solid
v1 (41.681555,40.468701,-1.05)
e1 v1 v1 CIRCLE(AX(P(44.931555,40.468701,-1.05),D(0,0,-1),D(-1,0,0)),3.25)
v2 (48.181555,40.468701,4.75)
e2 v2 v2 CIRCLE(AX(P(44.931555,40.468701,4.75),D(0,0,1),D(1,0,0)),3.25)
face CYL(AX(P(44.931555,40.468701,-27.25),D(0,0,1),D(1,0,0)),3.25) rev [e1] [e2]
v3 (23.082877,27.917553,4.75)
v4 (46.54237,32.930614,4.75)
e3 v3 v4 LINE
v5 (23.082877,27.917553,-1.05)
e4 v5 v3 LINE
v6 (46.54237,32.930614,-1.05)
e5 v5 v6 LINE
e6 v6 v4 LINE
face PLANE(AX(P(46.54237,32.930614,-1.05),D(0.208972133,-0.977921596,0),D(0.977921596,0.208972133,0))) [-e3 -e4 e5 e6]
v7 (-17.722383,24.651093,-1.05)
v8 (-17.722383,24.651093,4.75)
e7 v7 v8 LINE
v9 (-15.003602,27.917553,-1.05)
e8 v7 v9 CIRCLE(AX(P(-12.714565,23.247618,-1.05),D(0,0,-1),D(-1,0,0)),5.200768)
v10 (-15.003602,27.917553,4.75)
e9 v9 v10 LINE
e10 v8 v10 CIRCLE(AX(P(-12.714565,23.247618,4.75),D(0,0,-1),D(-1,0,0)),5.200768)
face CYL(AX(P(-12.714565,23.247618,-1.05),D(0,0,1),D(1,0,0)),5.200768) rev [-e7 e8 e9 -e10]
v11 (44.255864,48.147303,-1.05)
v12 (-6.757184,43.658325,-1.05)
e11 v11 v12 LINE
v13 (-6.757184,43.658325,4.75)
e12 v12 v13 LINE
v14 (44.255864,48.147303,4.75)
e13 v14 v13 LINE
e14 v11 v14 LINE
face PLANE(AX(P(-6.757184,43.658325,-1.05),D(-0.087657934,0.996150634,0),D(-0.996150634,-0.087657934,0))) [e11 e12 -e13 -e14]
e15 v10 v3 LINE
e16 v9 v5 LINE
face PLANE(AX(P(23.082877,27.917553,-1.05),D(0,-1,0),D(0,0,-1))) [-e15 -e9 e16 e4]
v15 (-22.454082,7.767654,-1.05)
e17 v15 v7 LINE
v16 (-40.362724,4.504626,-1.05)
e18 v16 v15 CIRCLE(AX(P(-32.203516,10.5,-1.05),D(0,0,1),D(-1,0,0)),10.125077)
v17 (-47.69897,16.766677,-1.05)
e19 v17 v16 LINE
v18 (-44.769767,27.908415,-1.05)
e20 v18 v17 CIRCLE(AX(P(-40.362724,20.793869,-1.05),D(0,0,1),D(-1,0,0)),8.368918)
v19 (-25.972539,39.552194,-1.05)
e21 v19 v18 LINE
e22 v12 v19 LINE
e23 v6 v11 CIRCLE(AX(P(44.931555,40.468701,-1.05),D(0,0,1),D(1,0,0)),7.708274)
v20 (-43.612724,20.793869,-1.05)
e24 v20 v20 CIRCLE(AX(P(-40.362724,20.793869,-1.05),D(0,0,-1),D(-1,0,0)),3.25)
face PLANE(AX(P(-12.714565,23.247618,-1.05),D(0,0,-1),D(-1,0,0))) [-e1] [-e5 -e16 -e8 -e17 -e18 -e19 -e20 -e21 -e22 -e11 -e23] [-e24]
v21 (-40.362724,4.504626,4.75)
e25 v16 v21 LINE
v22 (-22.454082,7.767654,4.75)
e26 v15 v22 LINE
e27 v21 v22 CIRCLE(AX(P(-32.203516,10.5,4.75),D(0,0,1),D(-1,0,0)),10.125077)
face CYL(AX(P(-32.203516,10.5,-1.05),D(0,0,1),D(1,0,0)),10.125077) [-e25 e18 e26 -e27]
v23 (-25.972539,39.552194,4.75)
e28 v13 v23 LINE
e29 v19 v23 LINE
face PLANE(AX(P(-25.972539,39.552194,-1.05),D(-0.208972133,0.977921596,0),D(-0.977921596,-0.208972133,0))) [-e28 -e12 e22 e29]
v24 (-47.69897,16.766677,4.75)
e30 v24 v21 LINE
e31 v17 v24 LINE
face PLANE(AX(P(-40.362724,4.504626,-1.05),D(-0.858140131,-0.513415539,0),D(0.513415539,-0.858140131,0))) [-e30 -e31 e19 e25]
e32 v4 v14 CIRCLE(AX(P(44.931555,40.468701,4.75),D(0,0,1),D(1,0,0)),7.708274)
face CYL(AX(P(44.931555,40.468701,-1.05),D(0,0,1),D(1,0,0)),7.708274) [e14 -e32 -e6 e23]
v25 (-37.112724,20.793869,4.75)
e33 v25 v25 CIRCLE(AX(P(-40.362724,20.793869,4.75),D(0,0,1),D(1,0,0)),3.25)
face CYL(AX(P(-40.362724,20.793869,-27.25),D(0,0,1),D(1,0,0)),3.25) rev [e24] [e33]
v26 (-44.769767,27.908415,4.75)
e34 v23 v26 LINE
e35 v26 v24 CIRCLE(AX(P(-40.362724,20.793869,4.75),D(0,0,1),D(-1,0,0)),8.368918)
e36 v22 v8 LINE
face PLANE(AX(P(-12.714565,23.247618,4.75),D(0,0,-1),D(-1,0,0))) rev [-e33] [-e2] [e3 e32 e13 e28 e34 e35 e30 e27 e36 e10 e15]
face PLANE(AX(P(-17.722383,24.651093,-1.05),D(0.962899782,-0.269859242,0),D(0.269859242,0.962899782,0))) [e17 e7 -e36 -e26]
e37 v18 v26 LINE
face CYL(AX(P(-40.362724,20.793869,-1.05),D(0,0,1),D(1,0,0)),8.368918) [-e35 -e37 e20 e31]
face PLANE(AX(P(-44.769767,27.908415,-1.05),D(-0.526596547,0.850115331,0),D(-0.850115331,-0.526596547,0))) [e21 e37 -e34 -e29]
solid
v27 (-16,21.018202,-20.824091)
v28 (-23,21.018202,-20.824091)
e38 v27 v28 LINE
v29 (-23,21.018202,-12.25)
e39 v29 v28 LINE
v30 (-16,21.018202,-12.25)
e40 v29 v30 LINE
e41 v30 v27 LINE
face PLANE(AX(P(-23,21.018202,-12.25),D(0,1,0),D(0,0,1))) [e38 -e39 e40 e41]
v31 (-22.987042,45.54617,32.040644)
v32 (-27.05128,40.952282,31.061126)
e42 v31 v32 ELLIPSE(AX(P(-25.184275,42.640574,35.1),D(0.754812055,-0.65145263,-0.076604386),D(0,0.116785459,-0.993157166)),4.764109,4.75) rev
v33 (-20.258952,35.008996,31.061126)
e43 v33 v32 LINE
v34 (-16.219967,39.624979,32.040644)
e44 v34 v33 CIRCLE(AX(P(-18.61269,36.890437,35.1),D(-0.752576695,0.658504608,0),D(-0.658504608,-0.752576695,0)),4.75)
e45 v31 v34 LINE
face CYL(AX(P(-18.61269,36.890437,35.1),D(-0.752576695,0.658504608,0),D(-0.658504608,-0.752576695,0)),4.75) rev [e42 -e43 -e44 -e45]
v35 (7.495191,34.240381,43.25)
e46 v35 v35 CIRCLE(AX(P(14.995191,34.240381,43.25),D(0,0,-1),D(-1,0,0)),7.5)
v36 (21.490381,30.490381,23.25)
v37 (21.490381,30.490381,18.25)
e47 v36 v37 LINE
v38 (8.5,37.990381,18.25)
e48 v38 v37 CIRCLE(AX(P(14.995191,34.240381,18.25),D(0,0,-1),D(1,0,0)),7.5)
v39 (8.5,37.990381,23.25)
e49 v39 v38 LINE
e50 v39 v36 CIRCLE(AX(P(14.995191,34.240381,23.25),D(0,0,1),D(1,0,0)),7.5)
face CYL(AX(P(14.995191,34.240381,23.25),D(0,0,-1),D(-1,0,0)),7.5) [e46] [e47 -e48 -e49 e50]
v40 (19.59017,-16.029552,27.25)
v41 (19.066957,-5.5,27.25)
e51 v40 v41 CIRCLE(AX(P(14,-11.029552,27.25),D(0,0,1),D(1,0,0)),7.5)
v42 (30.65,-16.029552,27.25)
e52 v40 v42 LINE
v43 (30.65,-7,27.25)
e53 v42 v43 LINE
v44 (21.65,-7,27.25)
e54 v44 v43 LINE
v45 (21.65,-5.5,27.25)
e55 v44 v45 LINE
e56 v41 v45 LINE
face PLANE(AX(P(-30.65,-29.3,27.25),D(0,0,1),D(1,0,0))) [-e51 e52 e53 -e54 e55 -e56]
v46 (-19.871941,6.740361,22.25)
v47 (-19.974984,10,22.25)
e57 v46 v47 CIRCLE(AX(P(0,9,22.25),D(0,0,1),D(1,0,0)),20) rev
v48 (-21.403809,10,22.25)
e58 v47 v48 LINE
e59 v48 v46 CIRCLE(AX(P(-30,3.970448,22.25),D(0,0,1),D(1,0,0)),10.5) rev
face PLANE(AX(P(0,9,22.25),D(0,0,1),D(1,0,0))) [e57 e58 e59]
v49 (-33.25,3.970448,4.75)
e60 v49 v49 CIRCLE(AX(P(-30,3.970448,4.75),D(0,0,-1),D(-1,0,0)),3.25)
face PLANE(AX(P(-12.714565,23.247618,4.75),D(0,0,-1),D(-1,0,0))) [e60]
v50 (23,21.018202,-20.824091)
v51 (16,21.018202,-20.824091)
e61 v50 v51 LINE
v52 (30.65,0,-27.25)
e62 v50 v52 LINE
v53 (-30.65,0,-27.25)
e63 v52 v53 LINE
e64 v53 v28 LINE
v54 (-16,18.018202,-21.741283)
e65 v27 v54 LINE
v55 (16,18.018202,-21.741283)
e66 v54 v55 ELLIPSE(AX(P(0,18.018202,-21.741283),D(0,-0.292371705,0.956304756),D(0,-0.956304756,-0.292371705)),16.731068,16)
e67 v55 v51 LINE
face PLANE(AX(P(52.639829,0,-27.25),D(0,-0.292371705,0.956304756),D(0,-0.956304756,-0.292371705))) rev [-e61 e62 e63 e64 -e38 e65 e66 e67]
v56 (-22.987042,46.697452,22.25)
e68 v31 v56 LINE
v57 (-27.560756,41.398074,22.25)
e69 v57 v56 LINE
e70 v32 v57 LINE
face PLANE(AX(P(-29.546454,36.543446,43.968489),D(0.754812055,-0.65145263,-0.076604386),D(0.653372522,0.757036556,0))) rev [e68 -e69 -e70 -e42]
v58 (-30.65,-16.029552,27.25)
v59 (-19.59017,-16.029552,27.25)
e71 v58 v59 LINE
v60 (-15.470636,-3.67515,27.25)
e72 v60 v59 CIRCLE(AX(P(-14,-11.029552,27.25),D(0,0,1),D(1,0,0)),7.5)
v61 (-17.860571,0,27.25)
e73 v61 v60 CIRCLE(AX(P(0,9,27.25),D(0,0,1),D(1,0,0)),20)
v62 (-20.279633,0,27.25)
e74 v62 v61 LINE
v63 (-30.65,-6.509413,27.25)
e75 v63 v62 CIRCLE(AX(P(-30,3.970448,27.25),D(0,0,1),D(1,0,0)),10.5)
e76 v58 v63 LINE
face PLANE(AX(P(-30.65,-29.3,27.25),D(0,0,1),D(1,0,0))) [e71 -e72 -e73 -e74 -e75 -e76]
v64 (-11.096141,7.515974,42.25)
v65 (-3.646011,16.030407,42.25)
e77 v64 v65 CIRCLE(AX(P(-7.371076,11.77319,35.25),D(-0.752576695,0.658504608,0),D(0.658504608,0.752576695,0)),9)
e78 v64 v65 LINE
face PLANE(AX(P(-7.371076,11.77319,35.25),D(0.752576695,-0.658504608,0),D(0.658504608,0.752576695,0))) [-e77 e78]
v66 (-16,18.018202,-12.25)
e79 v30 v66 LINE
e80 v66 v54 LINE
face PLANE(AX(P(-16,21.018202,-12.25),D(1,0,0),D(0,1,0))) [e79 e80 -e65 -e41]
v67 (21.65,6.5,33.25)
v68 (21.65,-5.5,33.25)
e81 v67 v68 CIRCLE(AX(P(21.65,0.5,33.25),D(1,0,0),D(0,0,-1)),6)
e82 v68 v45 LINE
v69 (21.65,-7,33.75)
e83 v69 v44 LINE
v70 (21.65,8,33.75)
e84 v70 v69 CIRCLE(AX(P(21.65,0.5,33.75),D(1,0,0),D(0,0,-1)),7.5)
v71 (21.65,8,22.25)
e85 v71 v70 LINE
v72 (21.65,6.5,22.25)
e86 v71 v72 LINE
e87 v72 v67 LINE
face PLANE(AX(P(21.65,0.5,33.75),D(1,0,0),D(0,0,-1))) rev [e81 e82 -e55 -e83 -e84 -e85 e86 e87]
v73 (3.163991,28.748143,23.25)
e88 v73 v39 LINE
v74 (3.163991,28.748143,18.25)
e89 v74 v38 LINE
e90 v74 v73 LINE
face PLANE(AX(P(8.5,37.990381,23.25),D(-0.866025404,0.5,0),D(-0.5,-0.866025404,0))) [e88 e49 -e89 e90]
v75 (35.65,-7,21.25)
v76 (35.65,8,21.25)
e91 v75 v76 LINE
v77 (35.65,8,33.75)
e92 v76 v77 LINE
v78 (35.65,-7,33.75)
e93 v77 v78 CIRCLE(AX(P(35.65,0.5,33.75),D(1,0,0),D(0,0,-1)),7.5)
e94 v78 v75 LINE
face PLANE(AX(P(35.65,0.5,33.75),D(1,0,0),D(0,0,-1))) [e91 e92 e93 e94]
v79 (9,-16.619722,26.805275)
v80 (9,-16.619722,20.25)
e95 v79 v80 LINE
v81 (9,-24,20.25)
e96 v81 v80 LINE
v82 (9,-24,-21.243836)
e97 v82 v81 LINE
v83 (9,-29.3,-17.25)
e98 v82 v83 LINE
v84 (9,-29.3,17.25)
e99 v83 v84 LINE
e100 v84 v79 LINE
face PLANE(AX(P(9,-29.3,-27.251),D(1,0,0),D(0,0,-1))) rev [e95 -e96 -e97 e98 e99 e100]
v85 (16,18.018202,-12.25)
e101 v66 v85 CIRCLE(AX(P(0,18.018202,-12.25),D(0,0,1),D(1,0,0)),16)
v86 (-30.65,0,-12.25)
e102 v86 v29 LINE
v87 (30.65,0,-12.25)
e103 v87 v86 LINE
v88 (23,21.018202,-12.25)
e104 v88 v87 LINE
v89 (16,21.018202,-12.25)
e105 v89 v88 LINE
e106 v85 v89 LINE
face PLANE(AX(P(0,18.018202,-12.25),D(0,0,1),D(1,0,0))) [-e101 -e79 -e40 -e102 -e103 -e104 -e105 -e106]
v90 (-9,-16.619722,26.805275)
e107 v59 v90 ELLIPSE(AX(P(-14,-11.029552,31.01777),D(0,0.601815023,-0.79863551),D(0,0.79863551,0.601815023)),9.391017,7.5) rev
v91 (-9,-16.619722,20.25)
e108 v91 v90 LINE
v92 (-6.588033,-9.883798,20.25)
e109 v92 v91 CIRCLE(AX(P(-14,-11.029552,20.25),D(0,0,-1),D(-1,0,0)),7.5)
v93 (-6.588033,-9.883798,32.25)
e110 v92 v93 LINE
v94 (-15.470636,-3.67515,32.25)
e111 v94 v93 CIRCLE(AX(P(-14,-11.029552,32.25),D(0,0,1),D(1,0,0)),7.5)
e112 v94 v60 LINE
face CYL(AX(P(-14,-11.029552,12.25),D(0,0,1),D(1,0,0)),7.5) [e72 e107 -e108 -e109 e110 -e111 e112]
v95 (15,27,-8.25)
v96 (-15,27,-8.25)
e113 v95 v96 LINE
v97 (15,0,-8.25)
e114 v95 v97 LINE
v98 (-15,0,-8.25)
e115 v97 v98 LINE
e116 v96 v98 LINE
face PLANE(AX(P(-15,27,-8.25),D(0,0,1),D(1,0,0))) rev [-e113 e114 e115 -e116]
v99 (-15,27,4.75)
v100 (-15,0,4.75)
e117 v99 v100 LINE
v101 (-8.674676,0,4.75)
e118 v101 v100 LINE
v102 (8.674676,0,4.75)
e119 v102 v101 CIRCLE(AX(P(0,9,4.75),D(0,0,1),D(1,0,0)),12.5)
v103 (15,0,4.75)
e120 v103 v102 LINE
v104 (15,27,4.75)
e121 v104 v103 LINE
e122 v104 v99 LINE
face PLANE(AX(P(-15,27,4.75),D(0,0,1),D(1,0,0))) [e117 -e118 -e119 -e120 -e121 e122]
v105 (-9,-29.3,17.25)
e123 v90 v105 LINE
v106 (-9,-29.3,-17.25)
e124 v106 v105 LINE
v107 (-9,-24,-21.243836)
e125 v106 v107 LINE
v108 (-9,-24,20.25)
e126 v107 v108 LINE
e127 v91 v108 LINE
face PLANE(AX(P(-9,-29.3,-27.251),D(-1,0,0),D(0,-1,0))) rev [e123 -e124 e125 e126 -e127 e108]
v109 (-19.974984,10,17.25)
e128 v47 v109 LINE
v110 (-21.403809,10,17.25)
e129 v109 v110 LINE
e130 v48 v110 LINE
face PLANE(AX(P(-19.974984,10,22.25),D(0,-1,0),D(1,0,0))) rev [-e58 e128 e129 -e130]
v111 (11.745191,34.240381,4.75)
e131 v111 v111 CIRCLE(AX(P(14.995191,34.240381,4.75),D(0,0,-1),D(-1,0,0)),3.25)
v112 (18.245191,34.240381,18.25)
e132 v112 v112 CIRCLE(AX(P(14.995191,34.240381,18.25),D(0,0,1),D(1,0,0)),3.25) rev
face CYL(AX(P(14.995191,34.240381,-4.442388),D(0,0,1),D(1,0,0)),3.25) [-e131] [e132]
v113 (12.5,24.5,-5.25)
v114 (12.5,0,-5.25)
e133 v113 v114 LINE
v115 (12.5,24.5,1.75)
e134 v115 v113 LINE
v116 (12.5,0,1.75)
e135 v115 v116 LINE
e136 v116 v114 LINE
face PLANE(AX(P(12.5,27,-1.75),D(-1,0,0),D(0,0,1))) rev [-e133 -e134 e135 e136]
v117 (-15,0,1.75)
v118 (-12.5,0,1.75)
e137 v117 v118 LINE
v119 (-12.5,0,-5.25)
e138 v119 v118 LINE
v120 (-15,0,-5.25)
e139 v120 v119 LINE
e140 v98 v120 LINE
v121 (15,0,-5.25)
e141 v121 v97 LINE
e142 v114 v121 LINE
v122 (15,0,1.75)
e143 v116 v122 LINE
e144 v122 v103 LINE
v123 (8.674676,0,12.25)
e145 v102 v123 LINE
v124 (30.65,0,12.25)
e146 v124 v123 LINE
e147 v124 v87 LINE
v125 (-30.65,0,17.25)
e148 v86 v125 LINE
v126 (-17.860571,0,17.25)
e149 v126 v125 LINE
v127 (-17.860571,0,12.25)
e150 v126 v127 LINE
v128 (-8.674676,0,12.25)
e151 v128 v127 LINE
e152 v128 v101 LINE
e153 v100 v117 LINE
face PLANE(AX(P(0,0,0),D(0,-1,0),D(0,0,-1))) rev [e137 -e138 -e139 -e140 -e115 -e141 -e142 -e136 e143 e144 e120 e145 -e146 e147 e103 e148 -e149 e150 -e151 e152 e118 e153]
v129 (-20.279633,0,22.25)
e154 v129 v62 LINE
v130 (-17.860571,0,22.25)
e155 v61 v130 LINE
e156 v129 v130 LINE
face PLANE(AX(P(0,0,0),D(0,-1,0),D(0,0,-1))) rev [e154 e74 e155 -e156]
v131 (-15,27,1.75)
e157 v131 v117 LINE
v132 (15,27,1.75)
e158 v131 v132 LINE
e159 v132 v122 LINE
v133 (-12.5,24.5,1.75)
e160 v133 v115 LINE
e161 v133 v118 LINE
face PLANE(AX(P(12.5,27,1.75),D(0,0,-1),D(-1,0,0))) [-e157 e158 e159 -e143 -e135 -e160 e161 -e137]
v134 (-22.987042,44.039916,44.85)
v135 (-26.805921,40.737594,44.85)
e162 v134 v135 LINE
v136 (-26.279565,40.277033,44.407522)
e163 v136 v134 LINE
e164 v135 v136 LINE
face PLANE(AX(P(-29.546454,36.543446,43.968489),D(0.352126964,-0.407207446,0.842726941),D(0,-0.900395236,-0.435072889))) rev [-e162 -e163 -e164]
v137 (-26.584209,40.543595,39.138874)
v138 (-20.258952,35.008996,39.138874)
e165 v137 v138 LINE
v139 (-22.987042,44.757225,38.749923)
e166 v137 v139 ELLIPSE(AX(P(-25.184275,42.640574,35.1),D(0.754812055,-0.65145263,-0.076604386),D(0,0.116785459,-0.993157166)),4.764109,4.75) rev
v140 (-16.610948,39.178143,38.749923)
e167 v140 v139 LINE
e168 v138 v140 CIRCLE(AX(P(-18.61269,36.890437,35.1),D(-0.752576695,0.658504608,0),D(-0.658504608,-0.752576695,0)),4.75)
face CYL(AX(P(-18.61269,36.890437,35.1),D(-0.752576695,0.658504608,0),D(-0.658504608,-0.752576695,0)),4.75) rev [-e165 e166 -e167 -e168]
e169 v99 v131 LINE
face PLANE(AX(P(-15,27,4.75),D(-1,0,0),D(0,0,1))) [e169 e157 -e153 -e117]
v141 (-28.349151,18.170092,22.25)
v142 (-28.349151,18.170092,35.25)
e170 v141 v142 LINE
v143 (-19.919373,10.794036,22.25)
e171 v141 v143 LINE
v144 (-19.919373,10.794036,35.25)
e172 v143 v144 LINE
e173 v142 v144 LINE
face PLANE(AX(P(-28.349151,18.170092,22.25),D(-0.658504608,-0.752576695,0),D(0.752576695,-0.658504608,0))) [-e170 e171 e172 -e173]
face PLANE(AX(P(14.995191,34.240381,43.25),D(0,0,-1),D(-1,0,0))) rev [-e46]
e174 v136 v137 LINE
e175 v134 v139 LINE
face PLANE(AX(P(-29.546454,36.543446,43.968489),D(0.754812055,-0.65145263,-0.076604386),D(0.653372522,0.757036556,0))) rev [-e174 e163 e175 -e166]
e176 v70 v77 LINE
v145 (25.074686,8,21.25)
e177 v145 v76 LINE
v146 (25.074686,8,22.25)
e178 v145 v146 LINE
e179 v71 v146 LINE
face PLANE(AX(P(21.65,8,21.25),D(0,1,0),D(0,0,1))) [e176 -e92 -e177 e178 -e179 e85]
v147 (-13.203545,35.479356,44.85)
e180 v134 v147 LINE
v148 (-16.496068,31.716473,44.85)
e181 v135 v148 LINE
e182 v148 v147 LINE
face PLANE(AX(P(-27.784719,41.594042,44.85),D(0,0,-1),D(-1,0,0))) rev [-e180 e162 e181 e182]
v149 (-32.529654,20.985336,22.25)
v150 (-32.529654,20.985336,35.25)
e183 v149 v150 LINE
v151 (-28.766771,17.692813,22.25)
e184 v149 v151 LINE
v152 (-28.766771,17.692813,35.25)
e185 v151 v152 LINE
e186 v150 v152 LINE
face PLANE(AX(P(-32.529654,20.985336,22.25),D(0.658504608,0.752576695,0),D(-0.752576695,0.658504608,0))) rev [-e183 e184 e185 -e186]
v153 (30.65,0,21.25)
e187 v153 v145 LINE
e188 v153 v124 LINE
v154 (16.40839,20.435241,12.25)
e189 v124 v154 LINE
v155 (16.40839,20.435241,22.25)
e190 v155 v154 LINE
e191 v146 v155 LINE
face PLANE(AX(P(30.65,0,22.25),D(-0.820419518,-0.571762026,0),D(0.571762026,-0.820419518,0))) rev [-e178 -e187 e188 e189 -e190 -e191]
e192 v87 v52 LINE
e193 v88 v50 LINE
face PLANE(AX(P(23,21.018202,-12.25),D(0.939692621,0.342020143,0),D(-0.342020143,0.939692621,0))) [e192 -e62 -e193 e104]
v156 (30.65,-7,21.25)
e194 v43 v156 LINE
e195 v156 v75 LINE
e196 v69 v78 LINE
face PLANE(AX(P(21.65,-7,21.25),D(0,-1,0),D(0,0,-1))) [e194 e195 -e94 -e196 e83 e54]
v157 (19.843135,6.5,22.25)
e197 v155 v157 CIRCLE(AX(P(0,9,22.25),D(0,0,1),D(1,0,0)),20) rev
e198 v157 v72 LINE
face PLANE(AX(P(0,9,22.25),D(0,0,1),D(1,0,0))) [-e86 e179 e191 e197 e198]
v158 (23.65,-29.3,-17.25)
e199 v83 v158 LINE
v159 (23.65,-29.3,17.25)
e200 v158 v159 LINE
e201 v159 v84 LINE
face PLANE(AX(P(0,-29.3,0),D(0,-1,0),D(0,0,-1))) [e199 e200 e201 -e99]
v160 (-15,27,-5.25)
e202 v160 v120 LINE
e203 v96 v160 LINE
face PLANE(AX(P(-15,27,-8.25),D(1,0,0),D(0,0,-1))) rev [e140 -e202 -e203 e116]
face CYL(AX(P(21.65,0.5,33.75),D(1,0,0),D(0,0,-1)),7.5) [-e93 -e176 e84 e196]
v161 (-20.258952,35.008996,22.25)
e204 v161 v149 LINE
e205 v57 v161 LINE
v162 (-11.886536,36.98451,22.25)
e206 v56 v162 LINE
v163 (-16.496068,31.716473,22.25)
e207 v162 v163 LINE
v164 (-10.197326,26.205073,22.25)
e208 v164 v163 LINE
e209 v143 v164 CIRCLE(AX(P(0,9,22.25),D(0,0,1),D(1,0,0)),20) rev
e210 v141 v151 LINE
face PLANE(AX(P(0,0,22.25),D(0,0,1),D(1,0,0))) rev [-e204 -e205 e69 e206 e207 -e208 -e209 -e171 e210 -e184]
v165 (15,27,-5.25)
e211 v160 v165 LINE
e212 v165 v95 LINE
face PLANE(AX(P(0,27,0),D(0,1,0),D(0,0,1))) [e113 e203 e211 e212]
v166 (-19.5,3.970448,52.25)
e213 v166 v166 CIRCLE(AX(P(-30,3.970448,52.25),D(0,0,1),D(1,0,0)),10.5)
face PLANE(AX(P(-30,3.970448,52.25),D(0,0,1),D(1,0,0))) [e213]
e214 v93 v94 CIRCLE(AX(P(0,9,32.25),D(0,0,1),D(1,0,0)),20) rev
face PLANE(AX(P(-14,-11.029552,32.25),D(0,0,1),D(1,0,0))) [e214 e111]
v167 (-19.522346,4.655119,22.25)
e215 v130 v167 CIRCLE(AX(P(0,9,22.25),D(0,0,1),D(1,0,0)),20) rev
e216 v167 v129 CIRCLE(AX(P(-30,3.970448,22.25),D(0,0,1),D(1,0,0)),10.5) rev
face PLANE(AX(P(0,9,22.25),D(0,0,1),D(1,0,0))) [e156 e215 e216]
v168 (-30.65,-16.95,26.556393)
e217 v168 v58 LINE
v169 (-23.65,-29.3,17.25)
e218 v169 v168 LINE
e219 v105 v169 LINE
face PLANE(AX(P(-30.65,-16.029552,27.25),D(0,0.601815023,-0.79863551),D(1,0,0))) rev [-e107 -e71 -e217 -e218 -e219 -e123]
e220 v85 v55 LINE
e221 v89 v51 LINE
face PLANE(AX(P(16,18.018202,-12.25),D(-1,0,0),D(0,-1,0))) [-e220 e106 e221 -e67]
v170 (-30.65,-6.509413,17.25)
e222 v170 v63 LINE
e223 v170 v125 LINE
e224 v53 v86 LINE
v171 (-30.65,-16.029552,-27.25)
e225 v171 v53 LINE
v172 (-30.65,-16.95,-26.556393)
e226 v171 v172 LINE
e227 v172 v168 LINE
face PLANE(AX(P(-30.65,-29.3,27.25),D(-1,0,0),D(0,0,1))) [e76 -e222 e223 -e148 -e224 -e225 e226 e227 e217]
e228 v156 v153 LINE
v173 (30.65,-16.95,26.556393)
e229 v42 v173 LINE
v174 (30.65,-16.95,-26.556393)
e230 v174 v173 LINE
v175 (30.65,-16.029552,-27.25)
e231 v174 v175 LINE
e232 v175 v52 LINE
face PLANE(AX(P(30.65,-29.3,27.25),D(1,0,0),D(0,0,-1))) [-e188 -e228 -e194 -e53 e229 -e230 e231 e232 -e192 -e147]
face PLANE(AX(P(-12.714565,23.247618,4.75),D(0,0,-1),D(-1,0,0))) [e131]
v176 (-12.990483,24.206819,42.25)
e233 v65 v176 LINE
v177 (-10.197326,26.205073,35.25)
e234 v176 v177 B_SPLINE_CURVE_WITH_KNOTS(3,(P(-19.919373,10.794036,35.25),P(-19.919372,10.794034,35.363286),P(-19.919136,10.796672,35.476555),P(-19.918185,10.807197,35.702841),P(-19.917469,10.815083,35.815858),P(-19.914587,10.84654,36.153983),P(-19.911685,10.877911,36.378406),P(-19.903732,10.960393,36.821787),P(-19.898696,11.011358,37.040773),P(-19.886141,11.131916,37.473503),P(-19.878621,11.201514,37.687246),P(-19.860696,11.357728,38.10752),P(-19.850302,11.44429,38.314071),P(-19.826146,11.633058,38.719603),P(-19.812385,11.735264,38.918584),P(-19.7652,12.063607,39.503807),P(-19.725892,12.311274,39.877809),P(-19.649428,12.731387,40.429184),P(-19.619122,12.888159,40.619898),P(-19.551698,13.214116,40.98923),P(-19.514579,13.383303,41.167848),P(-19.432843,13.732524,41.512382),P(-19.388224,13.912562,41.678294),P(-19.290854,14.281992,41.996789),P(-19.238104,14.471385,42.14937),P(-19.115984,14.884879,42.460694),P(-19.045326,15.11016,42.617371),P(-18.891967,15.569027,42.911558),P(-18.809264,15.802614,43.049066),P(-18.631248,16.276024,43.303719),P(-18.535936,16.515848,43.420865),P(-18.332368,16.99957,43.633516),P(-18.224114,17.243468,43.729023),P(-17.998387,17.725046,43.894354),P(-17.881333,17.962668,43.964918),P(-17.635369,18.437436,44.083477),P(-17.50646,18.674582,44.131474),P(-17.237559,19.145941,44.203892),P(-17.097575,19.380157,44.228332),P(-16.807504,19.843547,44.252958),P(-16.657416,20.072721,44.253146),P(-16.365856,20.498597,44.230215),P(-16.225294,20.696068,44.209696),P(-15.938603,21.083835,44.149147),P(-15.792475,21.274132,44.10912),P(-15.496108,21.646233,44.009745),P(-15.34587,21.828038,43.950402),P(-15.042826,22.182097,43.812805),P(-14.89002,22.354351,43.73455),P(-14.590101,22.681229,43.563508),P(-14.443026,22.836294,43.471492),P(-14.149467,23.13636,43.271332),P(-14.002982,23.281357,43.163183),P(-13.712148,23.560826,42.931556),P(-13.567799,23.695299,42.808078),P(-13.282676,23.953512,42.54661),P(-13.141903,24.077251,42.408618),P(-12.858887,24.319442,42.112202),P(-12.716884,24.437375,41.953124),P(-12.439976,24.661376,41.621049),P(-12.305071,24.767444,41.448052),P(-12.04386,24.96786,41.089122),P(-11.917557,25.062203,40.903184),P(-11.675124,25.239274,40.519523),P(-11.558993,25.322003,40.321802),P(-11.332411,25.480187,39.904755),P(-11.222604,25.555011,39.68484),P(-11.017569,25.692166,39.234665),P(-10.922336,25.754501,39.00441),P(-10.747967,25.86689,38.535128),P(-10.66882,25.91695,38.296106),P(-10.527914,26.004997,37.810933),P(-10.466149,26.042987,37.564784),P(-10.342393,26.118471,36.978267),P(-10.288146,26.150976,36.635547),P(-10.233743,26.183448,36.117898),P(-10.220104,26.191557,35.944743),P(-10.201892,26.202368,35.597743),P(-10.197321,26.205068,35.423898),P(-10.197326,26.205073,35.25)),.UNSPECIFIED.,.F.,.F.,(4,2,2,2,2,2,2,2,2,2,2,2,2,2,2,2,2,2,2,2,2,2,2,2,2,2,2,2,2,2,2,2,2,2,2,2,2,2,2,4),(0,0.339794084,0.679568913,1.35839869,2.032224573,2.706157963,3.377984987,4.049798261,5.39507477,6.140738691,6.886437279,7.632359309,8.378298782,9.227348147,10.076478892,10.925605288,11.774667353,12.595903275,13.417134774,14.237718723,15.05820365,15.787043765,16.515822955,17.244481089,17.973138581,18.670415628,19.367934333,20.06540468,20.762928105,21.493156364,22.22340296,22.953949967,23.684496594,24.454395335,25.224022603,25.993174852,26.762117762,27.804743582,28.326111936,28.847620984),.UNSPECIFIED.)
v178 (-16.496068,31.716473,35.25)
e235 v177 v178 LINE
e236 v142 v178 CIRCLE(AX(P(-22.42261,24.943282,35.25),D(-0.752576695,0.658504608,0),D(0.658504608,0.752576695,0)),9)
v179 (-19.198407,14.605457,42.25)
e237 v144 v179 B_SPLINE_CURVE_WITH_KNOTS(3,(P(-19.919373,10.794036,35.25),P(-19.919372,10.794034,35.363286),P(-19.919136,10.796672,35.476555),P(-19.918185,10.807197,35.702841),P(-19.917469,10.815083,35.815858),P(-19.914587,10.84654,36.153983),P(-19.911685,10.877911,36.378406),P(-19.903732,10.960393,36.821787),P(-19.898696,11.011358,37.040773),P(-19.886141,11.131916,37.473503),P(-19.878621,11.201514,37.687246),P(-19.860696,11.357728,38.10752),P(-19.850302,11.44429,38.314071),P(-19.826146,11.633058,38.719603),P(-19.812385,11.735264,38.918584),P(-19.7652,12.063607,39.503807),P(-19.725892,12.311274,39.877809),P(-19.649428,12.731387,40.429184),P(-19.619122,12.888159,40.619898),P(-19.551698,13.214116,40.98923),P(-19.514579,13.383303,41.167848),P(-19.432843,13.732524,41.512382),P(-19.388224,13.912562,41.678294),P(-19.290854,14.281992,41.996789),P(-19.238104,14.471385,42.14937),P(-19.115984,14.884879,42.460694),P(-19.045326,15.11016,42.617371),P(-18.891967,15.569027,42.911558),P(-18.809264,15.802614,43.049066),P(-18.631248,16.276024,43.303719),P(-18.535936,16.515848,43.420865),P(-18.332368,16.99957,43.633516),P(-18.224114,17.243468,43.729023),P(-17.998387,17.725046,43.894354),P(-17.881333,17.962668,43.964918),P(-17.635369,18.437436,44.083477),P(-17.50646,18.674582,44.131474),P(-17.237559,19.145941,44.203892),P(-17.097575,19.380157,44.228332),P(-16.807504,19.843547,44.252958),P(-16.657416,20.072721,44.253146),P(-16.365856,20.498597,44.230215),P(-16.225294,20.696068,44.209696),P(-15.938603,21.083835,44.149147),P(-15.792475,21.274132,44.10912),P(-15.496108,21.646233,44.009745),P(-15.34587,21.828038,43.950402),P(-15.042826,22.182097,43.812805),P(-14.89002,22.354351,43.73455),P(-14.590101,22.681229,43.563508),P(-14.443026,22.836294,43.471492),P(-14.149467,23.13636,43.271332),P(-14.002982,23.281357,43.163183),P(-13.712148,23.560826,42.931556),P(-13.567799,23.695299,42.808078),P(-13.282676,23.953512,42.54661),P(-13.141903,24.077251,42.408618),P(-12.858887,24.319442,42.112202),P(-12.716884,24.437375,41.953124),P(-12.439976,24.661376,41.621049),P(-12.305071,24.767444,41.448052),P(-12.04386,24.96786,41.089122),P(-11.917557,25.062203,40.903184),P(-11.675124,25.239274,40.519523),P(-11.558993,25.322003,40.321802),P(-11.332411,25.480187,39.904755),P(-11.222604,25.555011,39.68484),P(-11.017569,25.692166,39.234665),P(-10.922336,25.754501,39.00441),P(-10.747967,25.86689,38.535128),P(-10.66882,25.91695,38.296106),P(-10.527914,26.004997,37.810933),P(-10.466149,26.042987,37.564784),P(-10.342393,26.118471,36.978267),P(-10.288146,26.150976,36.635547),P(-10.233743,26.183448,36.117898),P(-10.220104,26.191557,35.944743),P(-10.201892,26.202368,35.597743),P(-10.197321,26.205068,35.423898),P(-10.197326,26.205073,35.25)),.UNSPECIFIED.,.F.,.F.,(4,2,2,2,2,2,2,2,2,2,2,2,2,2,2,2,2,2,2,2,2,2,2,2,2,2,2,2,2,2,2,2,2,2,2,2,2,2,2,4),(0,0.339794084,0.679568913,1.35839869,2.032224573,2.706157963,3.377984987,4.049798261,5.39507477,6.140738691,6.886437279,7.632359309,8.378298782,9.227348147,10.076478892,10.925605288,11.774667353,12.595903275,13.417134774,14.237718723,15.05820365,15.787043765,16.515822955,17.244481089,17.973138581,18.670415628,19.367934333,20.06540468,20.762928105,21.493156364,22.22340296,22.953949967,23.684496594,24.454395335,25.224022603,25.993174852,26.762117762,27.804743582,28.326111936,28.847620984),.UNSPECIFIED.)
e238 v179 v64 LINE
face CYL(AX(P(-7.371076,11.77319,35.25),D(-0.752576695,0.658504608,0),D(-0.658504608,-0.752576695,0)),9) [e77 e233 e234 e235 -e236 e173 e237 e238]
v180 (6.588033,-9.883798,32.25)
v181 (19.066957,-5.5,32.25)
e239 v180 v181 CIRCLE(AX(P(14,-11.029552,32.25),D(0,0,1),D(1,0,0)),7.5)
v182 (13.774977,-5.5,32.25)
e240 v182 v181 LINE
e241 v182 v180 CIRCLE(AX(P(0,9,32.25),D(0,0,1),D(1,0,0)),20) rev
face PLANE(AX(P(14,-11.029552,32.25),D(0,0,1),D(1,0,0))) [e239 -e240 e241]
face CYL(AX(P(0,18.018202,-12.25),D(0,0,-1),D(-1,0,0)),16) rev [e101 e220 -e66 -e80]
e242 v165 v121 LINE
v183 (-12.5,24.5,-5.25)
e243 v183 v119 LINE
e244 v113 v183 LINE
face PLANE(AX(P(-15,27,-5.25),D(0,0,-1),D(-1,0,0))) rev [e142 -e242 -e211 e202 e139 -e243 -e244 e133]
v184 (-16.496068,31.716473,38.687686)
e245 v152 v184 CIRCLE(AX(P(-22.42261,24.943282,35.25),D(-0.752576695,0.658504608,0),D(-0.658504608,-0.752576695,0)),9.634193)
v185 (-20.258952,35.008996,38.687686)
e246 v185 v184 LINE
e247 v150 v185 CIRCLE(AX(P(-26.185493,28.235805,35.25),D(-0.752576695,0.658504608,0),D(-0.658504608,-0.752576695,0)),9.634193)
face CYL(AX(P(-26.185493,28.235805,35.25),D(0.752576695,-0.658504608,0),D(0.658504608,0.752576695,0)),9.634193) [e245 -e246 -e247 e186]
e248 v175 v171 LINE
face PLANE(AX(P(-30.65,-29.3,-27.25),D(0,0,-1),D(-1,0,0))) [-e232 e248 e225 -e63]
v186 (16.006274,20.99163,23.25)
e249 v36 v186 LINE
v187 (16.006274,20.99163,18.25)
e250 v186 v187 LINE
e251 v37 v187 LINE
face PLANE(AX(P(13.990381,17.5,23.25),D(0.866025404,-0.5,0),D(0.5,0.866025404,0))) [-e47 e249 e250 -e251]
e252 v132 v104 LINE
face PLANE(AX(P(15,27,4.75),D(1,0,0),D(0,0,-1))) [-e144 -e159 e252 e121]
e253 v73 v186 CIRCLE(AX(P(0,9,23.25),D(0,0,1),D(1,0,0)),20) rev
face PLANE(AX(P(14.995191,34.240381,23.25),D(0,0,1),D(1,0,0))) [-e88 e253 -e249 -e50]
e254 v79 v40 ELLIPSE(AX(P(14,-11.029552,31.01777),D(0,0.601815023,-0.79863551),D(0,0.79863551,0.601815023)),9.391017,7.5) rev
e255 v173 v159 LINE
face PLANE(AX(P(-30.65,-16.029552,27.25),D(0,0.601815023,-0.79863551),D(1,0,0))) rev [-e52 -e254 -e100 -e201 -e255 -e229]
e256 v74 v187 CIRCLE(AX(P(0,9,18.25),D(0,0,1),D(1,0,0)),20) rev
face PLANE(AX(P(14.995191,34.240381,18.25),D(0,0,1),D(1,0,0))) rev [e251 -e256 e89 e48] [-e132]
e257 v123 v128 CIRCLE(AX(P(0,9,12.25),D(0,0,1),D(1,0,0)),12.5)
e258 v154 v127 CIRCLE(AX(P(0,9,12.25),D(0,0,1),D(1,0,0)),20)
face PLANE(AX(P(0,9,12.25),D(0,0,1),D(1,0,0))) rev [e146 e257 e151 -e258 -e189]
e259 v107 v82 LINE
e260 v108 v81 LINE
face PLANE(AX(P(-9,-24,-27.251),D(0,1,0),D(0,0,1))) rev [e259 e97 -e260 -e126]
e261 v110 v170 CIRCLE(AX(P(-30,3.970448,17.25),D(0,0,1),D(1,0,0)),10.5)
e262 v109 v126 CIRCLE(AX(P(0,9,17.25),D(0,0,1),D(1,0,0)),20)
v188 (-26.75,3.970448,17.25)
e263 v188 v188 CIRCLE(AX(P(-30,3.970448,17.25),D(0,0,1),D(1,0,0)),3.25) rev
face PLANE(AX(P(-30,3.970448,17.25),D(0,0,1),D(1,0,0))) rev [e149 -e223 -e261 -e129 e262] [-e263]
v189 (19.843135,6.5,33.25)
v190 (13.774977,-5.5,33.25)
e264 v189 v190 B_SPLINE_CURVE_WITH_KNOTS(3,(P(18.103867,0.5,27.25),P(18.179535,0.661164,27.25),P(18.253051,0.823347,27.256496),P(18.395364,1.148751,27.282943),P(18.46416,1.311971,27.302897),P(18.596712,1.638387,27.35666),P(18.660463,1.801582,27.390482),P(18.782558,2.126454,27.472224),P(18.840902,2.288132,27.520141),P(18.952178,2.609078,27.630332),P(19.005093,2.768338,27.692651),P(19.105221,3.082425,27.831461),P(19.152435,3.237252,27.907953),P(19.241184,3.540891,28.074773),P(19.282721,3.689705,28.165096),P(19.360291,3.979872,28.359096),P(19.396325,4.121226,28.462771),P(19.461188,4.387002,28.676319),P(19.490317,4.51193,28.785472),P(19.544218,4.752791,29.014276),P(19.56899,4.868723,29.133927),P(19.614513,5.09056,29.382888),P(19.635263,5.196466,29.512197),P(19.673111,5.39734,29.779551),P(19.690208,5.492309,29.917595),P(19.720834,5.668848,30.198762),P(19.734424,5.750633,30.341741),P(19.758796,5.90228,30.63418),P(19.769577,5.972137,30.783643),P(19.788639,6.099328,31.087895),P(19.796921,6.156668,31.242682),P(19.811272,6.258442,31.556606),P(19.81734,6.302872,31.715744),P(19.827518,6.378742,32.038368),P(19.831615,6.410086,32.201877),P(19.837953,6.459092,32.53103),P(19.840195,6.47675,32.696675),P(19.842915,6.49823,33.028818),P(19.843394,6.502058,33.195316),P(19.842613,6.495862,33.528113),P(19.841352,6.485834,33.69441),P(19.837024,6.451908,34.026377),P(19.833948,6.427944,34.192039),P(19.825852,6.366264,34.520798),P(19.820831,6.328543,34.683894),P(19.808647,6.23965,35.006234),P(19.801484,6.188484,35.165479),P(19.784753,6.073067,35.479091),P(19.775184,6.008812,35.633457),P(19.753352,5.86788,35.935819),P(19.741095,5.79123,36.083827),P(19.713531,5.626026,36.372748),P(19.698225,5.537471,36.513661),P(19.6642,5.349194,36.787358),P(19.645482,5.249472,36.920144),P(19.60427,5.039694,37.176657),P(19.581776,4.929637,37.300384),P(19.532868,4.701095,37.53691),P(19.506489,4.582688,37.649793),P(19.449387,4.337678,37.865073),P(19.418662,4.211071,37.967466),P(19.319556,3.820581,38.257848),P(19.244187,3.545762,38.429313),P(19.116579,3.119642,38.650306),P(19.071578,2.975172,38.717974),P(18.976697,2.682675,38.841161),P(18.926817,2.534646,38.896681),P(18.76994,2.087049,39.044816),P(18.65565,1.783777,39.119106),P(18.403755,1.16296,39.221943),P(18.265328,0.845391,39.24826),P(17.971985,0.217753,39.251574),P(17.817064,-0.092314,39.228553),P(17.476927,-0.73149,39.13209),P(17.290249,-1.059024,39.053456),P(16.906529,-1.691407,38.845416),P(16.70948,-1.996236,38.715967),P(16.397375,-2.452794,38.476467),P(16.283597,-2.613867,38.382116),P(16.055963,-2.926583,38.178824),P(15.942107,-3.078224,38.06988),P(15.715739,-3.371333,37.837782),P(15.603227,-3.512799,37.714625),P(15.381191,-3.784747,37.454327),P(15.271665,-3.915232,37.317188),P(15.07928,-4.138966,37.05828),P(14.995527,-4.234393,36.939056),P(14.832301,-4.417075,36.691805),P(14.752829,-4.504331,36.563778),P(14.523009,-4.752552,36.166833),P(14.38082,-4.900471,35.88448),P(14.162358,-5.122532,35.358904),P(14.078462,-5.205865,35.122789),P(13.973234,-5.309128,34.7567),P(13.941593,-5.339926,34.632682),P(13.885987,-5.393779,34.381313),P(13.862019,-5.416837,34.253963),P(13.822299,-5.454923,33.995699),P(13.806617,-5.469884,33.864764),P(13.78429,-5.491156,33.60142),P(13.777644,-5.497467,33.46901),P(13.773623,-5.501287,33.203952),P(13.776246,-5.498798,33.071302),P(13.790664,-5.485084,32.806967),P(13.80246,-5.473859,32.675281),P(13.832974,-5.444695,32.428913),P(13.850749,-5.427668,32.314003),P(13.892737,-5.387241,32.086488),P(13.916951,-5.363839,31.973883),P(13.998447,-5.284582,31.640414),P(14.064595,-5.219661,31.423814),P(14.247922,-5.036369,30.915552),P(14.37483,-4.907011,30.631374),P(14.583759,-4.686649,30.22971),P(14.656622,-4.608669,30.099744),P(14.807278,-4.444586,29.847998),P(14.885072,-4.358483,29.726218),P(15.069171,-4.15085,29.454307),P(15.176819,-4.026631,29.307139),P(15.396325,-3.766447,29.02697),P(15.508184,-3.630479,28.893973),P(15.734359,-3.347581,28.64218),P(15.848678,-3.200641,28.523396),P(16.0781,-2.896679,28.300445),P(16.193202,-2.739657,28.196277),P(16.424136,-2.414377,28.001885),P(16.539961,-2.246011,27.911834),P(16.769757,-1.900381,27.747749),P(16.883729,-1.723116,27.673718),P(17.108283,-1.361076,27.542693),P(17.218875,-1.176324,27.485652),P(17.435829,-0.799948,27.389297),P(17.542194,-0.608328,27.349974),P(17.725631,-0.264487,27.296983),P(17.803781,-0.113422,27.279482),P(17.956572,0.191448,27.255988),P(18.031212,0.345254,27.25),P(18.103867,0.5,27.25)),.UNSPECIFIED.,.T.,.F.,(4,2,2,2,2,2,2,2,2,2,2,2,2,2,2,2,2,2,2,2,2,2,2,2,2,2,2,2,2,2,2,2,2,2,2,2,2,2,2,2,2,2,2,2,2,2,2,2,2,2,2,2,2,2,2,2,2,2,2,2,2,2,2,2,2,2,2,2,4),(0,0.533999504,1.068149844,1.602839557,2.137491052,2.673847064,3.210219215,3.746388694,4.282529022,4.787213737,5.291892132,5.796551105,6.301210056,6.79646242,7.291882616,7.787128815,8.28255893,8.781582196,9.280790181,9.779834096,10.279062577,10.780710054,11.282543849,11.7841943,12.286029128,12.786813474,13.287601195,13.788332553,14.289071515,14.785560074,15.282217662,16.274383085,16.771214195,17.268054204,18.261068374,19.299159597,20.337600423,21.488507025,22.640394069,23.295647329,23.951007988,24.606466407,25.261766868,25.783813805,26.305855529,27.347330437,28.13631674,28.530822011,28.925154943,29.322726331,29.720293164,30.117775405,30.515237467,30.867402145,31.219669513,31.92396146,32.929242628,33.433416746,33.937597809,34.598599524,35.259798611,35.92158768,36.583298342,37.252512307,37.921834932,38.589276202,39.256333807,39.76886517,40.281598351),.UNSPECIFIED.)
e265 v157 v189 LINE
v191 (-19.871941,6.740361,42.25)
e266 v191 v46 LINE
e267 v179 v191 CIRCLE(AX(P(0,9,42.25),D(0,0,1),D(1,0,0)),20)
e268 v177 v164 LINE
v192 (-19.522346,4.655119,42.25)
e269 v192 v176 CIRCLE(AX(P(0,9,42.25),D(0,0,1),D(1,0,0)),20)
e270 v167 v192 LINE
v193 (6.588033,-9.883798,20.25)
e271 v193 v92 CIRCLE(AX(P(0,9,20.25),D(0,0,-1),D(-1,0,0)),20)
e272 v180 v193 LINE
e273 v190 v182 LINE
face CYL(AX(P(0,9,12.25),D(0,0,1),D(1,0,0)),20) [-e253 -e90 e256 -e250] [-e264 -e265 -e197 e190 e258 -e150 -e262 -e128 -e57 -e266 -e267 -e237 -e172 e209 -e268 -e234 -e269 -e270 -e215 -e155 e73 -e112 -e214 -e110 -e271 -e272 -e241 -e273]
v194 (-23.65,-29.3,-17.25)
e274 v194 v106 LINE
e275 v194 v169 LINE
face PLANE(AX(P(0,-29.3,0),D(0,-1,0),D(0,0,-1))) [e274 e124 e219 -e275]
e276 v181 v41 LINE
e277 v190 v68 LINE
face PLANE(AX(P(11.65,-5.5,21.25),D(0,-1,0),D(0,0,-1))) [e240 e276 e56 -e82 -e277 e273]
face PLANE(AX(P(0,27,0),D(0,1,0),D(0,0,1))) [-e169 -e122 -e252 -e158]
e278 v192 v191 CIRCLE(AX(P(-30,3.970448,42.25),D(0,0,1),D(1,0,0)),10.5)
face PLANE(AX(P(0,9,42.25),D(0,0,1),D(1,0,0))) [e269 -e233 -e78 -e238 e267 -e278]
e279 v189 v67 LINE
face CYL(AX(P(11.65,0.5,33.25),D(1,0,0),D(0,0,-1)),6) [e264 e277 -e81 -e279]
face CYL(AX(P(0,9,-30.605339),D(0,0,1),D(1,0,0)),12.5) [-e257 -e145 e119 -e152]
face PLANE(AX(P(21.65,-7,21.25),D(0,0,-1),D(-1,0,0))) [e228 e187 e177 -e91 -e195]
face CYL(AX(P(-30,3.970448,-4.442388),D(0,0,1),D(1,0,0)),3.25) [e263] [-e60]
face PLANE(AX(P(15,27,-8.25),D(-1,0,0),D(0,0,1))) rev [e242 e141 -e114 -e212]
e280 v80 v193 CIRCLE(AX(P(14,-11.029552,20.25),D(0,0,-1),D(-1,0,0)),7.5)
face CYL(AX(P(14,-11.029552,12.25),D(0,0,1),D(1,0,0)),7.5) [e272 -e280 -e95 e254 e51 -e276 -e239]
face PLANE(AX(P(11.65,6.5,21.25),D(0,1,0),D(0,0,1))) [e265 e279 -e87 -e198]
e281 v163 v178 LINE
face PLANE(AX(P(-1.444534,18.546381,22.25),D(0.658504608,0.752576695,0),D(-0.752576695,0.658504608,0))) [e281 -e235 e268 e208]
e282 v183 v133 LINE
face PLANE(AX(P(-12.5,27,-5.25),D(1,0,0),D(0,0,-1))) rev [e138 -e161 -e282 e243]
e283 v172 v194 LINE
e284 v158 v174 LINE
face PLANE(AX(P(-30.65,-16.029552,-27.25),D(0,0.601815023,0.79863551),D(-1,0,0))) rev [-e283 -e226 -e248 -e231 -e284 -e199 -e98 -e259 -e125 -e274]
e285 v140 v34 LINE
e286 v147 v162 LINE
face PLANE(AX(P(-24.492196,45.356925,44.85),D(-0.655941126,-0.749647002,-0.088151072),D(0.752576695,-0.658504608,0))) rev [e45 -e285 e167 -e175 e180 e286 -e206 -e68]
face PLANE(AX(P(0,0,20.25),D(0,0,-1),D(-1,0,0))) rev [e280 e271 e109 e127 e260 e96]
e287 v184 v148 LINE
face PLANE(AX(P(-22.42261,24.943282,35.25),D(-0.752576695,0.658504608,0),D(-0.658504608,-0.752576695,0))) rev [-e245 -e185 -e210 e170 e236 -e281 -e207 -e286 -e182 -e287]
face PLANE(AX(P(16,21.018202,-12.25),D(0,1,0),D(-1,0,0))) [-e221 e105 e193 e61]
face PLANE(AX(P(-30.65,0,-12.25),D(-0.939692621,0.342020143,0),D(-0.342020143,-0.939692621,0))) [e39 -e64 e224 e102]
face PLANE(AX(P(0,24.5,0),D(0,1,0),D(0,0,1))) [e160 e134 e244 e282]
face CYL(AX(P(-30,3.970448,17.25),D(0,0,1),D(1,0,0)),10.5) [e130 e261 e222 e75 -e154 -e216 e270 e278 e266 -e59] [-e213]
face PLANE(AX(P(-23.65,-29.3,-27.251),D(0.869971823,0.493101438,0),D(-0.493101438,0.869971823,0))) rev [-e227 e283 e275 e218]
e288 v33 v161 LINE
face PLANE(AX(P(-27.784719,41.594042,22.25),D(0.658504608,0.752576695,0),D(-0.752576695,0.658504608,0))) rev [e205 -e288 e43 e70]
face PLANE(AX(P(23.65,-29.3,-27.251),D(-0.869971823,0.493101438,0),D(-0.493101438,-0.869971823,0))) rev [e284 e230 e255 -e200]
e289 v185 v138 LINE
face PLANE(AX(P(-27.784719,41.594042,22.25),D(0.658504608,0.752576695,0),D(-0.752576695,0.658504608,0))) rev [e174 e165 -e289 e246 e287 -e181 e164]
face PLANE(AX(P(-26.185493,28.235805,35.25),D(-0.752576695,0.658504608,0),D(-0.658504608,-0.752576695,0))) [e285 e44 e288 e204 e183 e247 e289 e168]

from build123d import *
from build123d.topology import SkipClean

# Parameters (mm, degrees)
CROQUIS4_W                    = 61.3
CROQUIS4_H                    = 54.5
SALIENTE_EXTRUIR1_DEPTH       = 29.3
CORTAR_EXTRUIR1_REACH         = 71.052
CROQUIS5_W                    = 18
CROQUIS5_H                    = 5.3
CHAFL_N2_SIZE                 = 10
CHAFL_N2_SIZE2                = 13.270448216
CROQUIS6_W                    = 18
CROQUIS6_H                    = 14.970448216
CORTAR_EXTRUIR2_DEPTH         = 7
SALIENTE_EXTRUIR2_DEPTH       = 15
SALIENTE_EXTRUIR2_DEPTH_BACK  = 15
CROQUIS7_R                    = 20
SALIENTE_EXTRUIR3_DEPTH       = 5
SALIENTE_EXTRUIR3_DEPTH_BACK  = 15
CROQUIS8_R                    = 7.5
SALIENTE_EXTRUIR4_DEPTH       = 25
SALIENTE_EXTRUIR4_DEPTH_BACK  = 10
CROQUIS9_R                    = 10.5
SALIENTE_EXTRUIR5_DEPTH       = 5
SALIENTE_EXTRUIR5_DEPTH_BACK  = 9
SALIENTE_EXTRUIR6_DEPTH       = 24
SALIENTE_EXTRUIR8_DEPTH       = 3
SALIENTE_EXTRUIR8_DEPTH_BACK  = 10
SALIENTE_EXTRUIR9_DEPTH       = 20
SALIENTE_EXTRUIR10_DEPTH      = 3
SALIENTE_EXTRUIR10_DEPTH_BACK = 2
SALIENTE_EXTRUIR11_START      = -25
CROQUIS17_R                   = 7.5
SALIENTE_EXTRUIR11_DEPTH      = 25
SALIENTE_EXTRUIR12_DEPTH      = 10
SALIENTE_EXTRUIR13_DEPTH      = 15
SALIENTE_EXTRUIR14_DEPTH      = 27
CROQUIS21_W                   = 25
CROQUIS21_H                   = 7
CORTAR_EXTRUIR3_DEPTH         = 2.5
SALIENTE_EXTRUIR15_START      = -17.5
CROQUIS22_R                   = 12.5
SALIENTE_EXTRUIR15_DEPTH      = 7.5
SALIENTE_EXTRUIR16_DEPTH      = 5.8
CORTAR_EXTRUIR5_START         = 12.25
CORTAR_EXTRUIR5_DEPTH         = 5
CROQUIS26_R                   = 3.25
SALIENTE_EXTRUIR17_DEPTH      = 13.5
CROQUIS25_R                   = 3.25
CORTAR_EXTRUIR7_DEPTH         = 86.721773981
CORTAR_EXTRUIR8_DEPTH         = 110.490999901
SALIENTE_EXTRUIR18_DEPTH      = 15
SALIENTE_EXTRUIR19_DEPTH      = 5
CROQUIS30_R                   = 4.75
CORTAR_EXTRUIR9_DEPTH         = 10
CORTAR_EXTRUIR10_DEPTH        = 10


# Read off the part's stored shape, not the designer's step: Cortar-Extruir5
with BuildPart() as part:
    # Croquis4 → Saliente-Extruir1 (new body)
    with BuildSketch(Plane(origin=(0, 0, 0), x_dir=(1, 0, 0), z_dir=(0, 1, 0))):
        Rectangle(CROQUIS4_W, CROQUIS4_H)
    extrude(amount=-SALIENTE_EXTRUIR1_DEPTH)

    # Croquis5 → Cortar-Extruir1 (cut, up to next)
    with BuildSketch(Plane.XY.offset(27.25), mode=Mode.PRIVATE) as cortar_extruir1_sk1:
        with Locations((0, -26.65)):
            Rectangle(CROQUIS5_W, CROQUIS5_H)
    cortar_extruir1_tool1 = extrude(cortar_extruir1_sk1.sketch, amount=-CORTAR_EXTRUIR1_REACH, mode=Mode.PRIVATE) & part.part
    # Croquis5 → Cortar-Extruir1 (cut, up to next)
    with BuildSketch(Plane.XY.offset(27.25), mode=Mode.PRIVATE) as cortar_extruir1_sk2:
        Polygon((-23.65, -29.3), (-30.65, -16.95), (-30.65, -29.3), align=None)
    cortar_extruir1_tool2 = extrude(cortar_extruir1_sk2.sketch, amount=-CORTAR_EXTRUIR1_REACH, mode=Mode.PRIVATE) & part.part
    # Croquis5 → Cortar-Extruir1 (cut, up to next)
    with BuildSketch(Plane.XY.offset(27.25), mode=Mode.PRIVATE) as cortar_extruir1_sk3:
        Polygon((23.65, -29.3), (30.65, -16.95), (30.65, -29.3), align=None)
    cortar_extruir1_tool3 = extrude(cortar_extruir1_sk3.sketch, amount=-CORTAR_EXTRUIR1_REACH, mode=Mode.PRIVATE) & part.part
    add(cortar_extruir1_tool1.solids().sort_by_distance((0, -26.65, 27.25))[0], mode=Mode.SUBTRACT)
    add(cortar_extruir1_tool2.solids().sort_by_distance((-28.316667, -25.183333, 27.25))[0], mode=Mode.SUBTRACT)
    add(cortar_extruir1_tool3.solids().sort_by_distance((28.316667, -25.183333, 27.25))[0], mode=Mode.SUBTRACT)

    # Chaflán2
    chafl_n2_edges = [part.edges().sort_by_distance(p)[0] for p in [
        (16.325, -29.3, -27.25),
        (16.325, -29.3, 27.25),
    ]]
    chafl_n2_side = [part.faces().sort_by_distance(p)[0] for p in [
        (16.325, -29.3, 0),
    ]]
    chamfer(chafl_n2_edges, length=CHAFL_N2_SIZE, length2=CHAFL_N2_SIZE2, reference=chafl_n2_side[0])

    # Croquis6 → Cortar-Extruir2 (cut)
    with BuildSketch(Plane.XY.offset(27.25)):
        with Locations((0, -16.514775892)):
            Rectangle(CROQUIS6_W, CROQUIS6_H)
    extrude(amount=-CORTAR_EXTRUIR2_DEPTH, mode=Mode.SUBTRACT)

    # Croquis7 → Saliente-Extruir2 (add, two sides: drawn at the far end of the back side and taken through both)
    with BuildSketch(Plane.XY.offset(27.25).offset(-SALIENTE_EXTRUIR2_DEPTH_BACK)):
        with Locations((0, 9)):
            Circle(CROQUIS7_R)
    extrude(amount=SALIENTE_EXTRUIR2_DEPTH + SALIENTE_EXTRUIR2_DEPTH_BACK)

    # Croquis8 → Saliente-Extruir3 (add, two sides: drawn at the far end of the back side and taken through both)
    with BuildSketch(Plane.XY.offset(27.25).offset(-SALIENTE_EXTRUIR3_DEPTH_BACK)):
        with Locations((14, -11.029551784)):
            Circle(CROQUIS8_R)
        with Locations((-14, -11.029551784)):
            Circle(CROQUIS8_R)
    extrude(amount=SALIENTE_EXTRUIR3_DEPTH + SALIENTE_EXTRUIR3_DEPTH_BACK)

    # Croquis9 → Saliente-Extruir4 (add, two sides: drawn at the far end of the back side and taken through both)
    with BuildSketch(Plane.XY.offset(27.25).offset(-SALIENTE_EXTRUIR4_DEPTH_BACK)):
        with Locations((-30, 3.970448216)):
            Circle(CROQUIS9_R)
    extrude(amount=SALIENTE_EXTRUIR4_DEPTH + SALIENTE_EXTRUIR4_DEPTH_BACK)

    # Croquis11 → Saliente-Extruir5 (add, two sides: drawn at the far end of the back side and taken through both)
    with BuildSketch(Plane(origin=(30.65, 0, 0), x_dir=(0, 0, -1), z_dir=(1, 0, 0)).offset(-SALIENTE_EXTRUIR5_DEPTH_BACK)):
        with BuildLine():
            Line((-21.25, -7), (-33.75, -7))
            ThreePointArc((-33.75, -7), (-41.25, 0.5), (-33.75, 8))
            Line((-33.75, 8), (-21.25, 8))
            Line((-21.25, 8), (-21.25, -7))
        make_face()
    extrude(amount=SALIENTE_EXTRUIR5_DEPTH + SALIENTE_EXTRUIR5_DEPTH_BACK)

    # Croquis12 → Saliente-Extruir6 (add)
    with BuildSketch(Plane(origin=(35.65, 0, 0), x_dir=(0, 0, -1), z_dir=(1, 0, 0))):
        with BuildLine():
            Line((-21.25, -5.5), (-21.25, 6.5))
            Line((-21.25, 6.5), (-33.25, 6.5))
            ThreePointArc((-33.25, 6.5), (-39.25, 0.5), (-33.25, -5.5))
            Line((-33.25, -5.5), (-21.25, -5.5))
        make_face()
    extrude(amount=-SALIENTE_EXTRUIR6_DEPTH)

    # Croquis14 → Saliente-Extruir8 (add, two sides: drawn at the far end of the back side and taken through both)
    with BuildSketch(Plane.XY.offset(32.25).offset(-SALIENTE_EXTRUIR8_DEPTH_BACK)):
        Polygon((-1.444534472, 18.546380505), (-16.496068366, 31.716472662), (-28.349151308, 18.170092157), (-13.297617414, 5), align=None)
    extrude(amount=SALIENTE_EXTRUIR8_DEPTH + SALIENTE_EXTRUIR8_DEPTH_BACK)

    # Croquis15 → Saliente-Extruir9 (add)
    with BuildSketch(Plane(origin=(-25.060803934, 21.928203442, 0), x_dir=(0, 0, 1), z_dir=(-0.7525766947068787, 0.6585046078685173, 0))):
        with BuildLine():
            Line((35.25, -4.993658867), (35.25, 13.006341133))
            ThreePointArc((35.25, 13.006341133), (44.25, 4.006341133), (35.25, -4.993658867))
        make_face()
    extrude(amount=-SALIENTE_EXTRUIR9_DEPTH)

    # Croquis16 → Saliente-Extruir10 (add, two sides: drawn at the far end of the back side and taken through both)
    with BuildSketch(Plane(origin=(0, 0, 21.25), x_dir=(-1, 0, 0), z_dir=(0, 0, -1)).offset(-SALIENTE_EXTRUIR10_DEPTH_BACK)):
        with BuildLine():
            Line((-8.5, 37.990381057), (-1, 25))
            Line((-1, 25), (-13.990381057, 17.5))
            Line((-13.990381057, 17.5), (-21.490381057, 30.490381057))
            ThreePointArc((-21.490381057, 30.490381057), (-18.745190528, 40.735571585), (-8.5, 37.990381057))
        make_face()
    extrude(amount=SALIENTE_EXTRUIR10_DEPTH + SALIENTE_EXTRUIR10_DEPTH_BACK)

    # Croquis17 → Saliente-Extruir11 (add)
    with SkipClean():  # the faces are left unmerged after this step: merging them gives an invalid solid
        with BuildSketch(Plane(origin=(0, 0, 18.25), x_dir=(-1, 0, 0), z_dir=(0, 0, -1)).offset(SALIENTE_EXTRUIR11_START)):
            with Locations((-14.995190528, 34.240381057)):
                Circle(CROQUIS17_R)
        extrude(amount=SALIENTE_EXTRUIR11_DEPTH)
    add(part.part.scale(1), mode=Mode.REPLACE)  # the faces are merged on a copy

    # Croquis18 → Saliente-Extruir12 (add)
    with BuildSketch(Plane.XY.offset(12.25)):
        with BuildLine():
            Line((30.65, 0), (16.408390364, 20.435240517))
            ThreePointArc((16.408390364, 20.435240517), (-5.51395587, 28.224887273), (-19.974984355, 10))
            Line((-19.974984355, 10), (-30.65, 10))
            Line((-30.65, 10), (-30.65, 0))
            Line((-30.65, 0), (30.65, 0))
        make_face()
    extrude(amount=SALIENTE_EXTRUIR12_DEPTH)

    # Croquis19 → Saliente-Extruir13 (add)
    with BuildSketch(Plane(origin=(0, 0, -27.25), x_dir=(-1, 0, 0), z_dir=(0, 0, -1))):
        with BuildLine():
            Line((-30.65, 0), (30.65, 0))
            Line((30.65, 0), (23, 21.018202259))
            Line((23, 21.018202259), (16, 21.018202259))
            Line((16, 21.018202259), (16, 18.018202259))
            ThreePointArc((16, 18.018202259), (0, 2.018202259), (-16, 18.018202259))
            Line((-16, 18.018202259), (-16, 21.018202259))
            Line((-16, 21.018202259), (-23, 21.018202259))
            Line((-23, 21.018202259), (-30.65, 0))
        make_face()
    extrude(amount=-SALIENTE_EXTRUIR13_DEPTH)

    # Croquis20 → Saliente-Extruir14 (add)
    with BuildSketch(Plane(origin=(0, 0, 0), x_dir=(1, 0, 0), z_dir=(0, 1, 0))):
        Polygon((-15, 5.25), (-12.5, 5.25), (-12.5, 1.75), (12.5, 1.75), (12.5, 5.25), (15, 5.25), (15, 8.25), (-15, 8.25), align=None)
    saliente_extruir14 = extrude(amount=SALIENTE_EXTRUIR14_DEPTH)

    # Simetría1: Saliente-Extruir14 across plane
    add(saliente_extruir14.mirror(Plane(origin=(-12.5, 27, -1.75), x_dir=(1, 0, 0), z_dir=(0, 0, -1))))

    # Croquis21 → Cortar-Extruir3 (cut)
    with SkipClean():  # the faces are left unmerged after this step: merging them gives an invalid solid
        with BuildSketch(Plane(origin=(0, 27, 0), x_dir=(1, 0, 0), z_dir=(0, 1, 0))):
            with Locations((0, 1.75)):
                Rectangle(CROQUIS21_W, CROQUIS21_H)
        extrude(amount=-CORTAR_EXTRUIR3_DEPTH, mode=Mode.SUBTRACT)

    # Croquis22 → Saliente-Extruir15 (add)
    with BuildSketch(Plane.XY.offset(22.25).offset(SALIENTE_EXTRUIR15_START)):
        with Locations((0, 9)):
            Circle(CROQUIS22_R)
    extrude(amount=SALIENTE_EXTRUIR15_DEPTH)

    # Cortar-Extruir5 outline → Cortar-Extruir5 (cut)
    with BuildSketch(Plane.XY.offset(CORTAR_EXTRUIR5_START)):
        with BuildLine():
            Line((-30.65, 10), (-30.65, 0))
            Line((-30.65, 0), (-17.860571099, 0))
            ThreePointArc((-17.860571099, 0), (-19.567378827, 4.862647482), (-19.974984355, 10))
            Line((-19.974984355, 10), (-30.65, 10))
        make_face()
    extrude(amount=CORTAR_EXTRUIR5_DEPTH, mode=Mode.SUBTRACT)

    # Croquis26 → Saliente-Extruir17 (add)
    with BuildSketch(Plane(origin=(0, 0, 18.25), x_dir=(-1, 0, 0), z_dir=(0, 0, -1))):
        with Locations(Location((-14.995190528, 34.240381057, 0), (0, 0, 180))):
            Circle(CROQUIS26_R)
        with Locations(Location((30, 3.970448216, 0), (0, 0, 180))):
            Circle(CROQUIS26_R)
    extrude(amount=SALIENTE_EXTRUIR17_DEPTH)

    # Croquis27 → Cortar-Extruir8 (cut, through all)
    with BuildSketch(Plane.ZY.offset(30.65)):
        Polygon((-27.25, 0), (-20.8240907, 21.018202259), (-27.25, 21.018202259), align=None)
    extrude(amount=-CORTAR_EXTRUIR8_DEPTH, mode=Mode.SUBTRACT)



with BuildPart() as body_2:
    # Croquis23 → Saliente-Extruir16 (new body)
    with BuildSketch(Plane.XY.offset(4.75)):
        with BuildLine():
            Line((-44.769767109, 27.908415043), (-25.972539186, 39.552194376))
            Line((-25.972539186, 39.552194376), (-6.757184018, 43.658324942))
            Line((-6.757184018, 43.658324942), (44.255864102, 48.147303088))
            ThreePointArc((44.255864102, 48.147303088), (52.554253117, 41.614111004), (46.54236984, 32.930614098))
            Line((46.54236984, 32.930614098), (23.082876702, 27.917553398))
            Line((23.082876702, 27.917553398), (-15.00360208, 27.917553398))
            ThreePointArc((-15.00360208, 27.917553398), (-16.711872119, 26.574707218), (-17.722383152, 24.651093472))
            Line((-17.722383152, 24.651093472), (-22.454082276, 7.767654496))
            ThreePointArc((-22.454082276, 7.767654496), (-30.388566077, 0.538919139), (-40.362723642, 4.504625749))
            Line((-40.362723642, 4.504625749), (-47.698970473, 16.766677308))
            ThreePointArc((-47.698970473, 16.766677308), (-48.456597665, 22.921778226), (-44.769767109, 27.908415043))
        make_face()
    extrude(amount=-SALIENTE_EXTRUIR16_DEPTH)

    # Croquis25 → Cortar-Extruir7 (cut, through all)
    with BuildSketch(Plane.XY.offset(4.75)):
        with Locations((44.93155545, 40.468701384)):
            Circle(CROQUIS25_R)
        with Locations((-40.362723642, 20.793869315)):
            Circle(CROQUIS25_R)
    extrude(amount=-CORTAR_EXTRUIR7_DEPTH, mode=Mode.SUBTRACT)


with BuildPart() as body_3:
    # Croquis28 → Saliente-Extruir18 (new body)
    with BuildSketch(Plane(origin=(-25.060803934, 21.928203442, 0), x_dir=(0, 0, 1), z_dir=(-0.7525766947068789, 0.6585046078685171, 0))):
        Polygon((22.25, 13.006341133), (44.85, 13.006341133), (44.85, 18.006341133), (22.25, 20.006341133), align=None)
    extrude(amount=SALIENTE_EXTRUIR18_DEPTH)


with BuildPart() as part_1:
    add(part.part)

    add(body_3.part)  # Saliente-Extruir19 merges body 3
    # Croquis29 → Saliente-Extruir19 (add)
    with BuildSketch(Plane(origin=(-25.060803934, 21.928203442, 0), x_dir=(0, 0, 1), z_dir=(-0.7525766947068789, 0.6585046078685171, 0))):
        with BuildLine():
            Line((22.25, 13.640534559), (22.25, -5.627852293))
            Line((22.25, -5.627852293), (35.25, -5.627852293))
            ThreePointArc((35.25, -5.627852293), (44.884193426, 4.006341133), (35.25, 13.640534559))
            Line((35.25, 13.640534559), (22.25, 13.640534559))
        make_face()
    extrude(amount=SALIENTE_EXTRUIR19_DEPTH)

    # Croquis30 → Cortar-Extruir9 (cut)
    with SkipClean():  # the faces are left unmerged after this step: merging them gives an invalid solid
        with BuildSketch(Plane(origin=(-36.349454354, 31.80577256, 0), x_dir=(0, 0, 1), z_dir=(-0.7525766947068789, 0.6585046078685171, 0))):
            with Locations((35.1, 15.506341133)):
                Circle(CROQUIS30_R)
        extrude(amount=-CORTAR_EXTRUIR9_DEPTH, mode=Mode.SUBTRACT)

    # Croquis31 → Cortar-Extruir10 (cut)
    with SkipClean():  # the faces are left unmerged after this step: merging them gives an invalid solid
        with BuildSketch(Plane(origin=(14.358433284, 16.409638039, 1.929611118), x_dir=(0.7548120551736586, -0.6514526302698987, -0.07660438550728446), z_dir=(0.6559411264469686, 0.7496470016536806, 0.08815107229710104))):
            Polygon((-49.476522514, -39.399877092), (-49.476522514, -14.485376724), (-51.166286947, -14.485376724), (-53.380891791, -41.459110359), align=None)
        extrude(amount=-CORTAR_EXTRUIR10_DEPTH, mode=Mode.SUBTRACT)


solid = Compound([body_2.part, part_1.part])
